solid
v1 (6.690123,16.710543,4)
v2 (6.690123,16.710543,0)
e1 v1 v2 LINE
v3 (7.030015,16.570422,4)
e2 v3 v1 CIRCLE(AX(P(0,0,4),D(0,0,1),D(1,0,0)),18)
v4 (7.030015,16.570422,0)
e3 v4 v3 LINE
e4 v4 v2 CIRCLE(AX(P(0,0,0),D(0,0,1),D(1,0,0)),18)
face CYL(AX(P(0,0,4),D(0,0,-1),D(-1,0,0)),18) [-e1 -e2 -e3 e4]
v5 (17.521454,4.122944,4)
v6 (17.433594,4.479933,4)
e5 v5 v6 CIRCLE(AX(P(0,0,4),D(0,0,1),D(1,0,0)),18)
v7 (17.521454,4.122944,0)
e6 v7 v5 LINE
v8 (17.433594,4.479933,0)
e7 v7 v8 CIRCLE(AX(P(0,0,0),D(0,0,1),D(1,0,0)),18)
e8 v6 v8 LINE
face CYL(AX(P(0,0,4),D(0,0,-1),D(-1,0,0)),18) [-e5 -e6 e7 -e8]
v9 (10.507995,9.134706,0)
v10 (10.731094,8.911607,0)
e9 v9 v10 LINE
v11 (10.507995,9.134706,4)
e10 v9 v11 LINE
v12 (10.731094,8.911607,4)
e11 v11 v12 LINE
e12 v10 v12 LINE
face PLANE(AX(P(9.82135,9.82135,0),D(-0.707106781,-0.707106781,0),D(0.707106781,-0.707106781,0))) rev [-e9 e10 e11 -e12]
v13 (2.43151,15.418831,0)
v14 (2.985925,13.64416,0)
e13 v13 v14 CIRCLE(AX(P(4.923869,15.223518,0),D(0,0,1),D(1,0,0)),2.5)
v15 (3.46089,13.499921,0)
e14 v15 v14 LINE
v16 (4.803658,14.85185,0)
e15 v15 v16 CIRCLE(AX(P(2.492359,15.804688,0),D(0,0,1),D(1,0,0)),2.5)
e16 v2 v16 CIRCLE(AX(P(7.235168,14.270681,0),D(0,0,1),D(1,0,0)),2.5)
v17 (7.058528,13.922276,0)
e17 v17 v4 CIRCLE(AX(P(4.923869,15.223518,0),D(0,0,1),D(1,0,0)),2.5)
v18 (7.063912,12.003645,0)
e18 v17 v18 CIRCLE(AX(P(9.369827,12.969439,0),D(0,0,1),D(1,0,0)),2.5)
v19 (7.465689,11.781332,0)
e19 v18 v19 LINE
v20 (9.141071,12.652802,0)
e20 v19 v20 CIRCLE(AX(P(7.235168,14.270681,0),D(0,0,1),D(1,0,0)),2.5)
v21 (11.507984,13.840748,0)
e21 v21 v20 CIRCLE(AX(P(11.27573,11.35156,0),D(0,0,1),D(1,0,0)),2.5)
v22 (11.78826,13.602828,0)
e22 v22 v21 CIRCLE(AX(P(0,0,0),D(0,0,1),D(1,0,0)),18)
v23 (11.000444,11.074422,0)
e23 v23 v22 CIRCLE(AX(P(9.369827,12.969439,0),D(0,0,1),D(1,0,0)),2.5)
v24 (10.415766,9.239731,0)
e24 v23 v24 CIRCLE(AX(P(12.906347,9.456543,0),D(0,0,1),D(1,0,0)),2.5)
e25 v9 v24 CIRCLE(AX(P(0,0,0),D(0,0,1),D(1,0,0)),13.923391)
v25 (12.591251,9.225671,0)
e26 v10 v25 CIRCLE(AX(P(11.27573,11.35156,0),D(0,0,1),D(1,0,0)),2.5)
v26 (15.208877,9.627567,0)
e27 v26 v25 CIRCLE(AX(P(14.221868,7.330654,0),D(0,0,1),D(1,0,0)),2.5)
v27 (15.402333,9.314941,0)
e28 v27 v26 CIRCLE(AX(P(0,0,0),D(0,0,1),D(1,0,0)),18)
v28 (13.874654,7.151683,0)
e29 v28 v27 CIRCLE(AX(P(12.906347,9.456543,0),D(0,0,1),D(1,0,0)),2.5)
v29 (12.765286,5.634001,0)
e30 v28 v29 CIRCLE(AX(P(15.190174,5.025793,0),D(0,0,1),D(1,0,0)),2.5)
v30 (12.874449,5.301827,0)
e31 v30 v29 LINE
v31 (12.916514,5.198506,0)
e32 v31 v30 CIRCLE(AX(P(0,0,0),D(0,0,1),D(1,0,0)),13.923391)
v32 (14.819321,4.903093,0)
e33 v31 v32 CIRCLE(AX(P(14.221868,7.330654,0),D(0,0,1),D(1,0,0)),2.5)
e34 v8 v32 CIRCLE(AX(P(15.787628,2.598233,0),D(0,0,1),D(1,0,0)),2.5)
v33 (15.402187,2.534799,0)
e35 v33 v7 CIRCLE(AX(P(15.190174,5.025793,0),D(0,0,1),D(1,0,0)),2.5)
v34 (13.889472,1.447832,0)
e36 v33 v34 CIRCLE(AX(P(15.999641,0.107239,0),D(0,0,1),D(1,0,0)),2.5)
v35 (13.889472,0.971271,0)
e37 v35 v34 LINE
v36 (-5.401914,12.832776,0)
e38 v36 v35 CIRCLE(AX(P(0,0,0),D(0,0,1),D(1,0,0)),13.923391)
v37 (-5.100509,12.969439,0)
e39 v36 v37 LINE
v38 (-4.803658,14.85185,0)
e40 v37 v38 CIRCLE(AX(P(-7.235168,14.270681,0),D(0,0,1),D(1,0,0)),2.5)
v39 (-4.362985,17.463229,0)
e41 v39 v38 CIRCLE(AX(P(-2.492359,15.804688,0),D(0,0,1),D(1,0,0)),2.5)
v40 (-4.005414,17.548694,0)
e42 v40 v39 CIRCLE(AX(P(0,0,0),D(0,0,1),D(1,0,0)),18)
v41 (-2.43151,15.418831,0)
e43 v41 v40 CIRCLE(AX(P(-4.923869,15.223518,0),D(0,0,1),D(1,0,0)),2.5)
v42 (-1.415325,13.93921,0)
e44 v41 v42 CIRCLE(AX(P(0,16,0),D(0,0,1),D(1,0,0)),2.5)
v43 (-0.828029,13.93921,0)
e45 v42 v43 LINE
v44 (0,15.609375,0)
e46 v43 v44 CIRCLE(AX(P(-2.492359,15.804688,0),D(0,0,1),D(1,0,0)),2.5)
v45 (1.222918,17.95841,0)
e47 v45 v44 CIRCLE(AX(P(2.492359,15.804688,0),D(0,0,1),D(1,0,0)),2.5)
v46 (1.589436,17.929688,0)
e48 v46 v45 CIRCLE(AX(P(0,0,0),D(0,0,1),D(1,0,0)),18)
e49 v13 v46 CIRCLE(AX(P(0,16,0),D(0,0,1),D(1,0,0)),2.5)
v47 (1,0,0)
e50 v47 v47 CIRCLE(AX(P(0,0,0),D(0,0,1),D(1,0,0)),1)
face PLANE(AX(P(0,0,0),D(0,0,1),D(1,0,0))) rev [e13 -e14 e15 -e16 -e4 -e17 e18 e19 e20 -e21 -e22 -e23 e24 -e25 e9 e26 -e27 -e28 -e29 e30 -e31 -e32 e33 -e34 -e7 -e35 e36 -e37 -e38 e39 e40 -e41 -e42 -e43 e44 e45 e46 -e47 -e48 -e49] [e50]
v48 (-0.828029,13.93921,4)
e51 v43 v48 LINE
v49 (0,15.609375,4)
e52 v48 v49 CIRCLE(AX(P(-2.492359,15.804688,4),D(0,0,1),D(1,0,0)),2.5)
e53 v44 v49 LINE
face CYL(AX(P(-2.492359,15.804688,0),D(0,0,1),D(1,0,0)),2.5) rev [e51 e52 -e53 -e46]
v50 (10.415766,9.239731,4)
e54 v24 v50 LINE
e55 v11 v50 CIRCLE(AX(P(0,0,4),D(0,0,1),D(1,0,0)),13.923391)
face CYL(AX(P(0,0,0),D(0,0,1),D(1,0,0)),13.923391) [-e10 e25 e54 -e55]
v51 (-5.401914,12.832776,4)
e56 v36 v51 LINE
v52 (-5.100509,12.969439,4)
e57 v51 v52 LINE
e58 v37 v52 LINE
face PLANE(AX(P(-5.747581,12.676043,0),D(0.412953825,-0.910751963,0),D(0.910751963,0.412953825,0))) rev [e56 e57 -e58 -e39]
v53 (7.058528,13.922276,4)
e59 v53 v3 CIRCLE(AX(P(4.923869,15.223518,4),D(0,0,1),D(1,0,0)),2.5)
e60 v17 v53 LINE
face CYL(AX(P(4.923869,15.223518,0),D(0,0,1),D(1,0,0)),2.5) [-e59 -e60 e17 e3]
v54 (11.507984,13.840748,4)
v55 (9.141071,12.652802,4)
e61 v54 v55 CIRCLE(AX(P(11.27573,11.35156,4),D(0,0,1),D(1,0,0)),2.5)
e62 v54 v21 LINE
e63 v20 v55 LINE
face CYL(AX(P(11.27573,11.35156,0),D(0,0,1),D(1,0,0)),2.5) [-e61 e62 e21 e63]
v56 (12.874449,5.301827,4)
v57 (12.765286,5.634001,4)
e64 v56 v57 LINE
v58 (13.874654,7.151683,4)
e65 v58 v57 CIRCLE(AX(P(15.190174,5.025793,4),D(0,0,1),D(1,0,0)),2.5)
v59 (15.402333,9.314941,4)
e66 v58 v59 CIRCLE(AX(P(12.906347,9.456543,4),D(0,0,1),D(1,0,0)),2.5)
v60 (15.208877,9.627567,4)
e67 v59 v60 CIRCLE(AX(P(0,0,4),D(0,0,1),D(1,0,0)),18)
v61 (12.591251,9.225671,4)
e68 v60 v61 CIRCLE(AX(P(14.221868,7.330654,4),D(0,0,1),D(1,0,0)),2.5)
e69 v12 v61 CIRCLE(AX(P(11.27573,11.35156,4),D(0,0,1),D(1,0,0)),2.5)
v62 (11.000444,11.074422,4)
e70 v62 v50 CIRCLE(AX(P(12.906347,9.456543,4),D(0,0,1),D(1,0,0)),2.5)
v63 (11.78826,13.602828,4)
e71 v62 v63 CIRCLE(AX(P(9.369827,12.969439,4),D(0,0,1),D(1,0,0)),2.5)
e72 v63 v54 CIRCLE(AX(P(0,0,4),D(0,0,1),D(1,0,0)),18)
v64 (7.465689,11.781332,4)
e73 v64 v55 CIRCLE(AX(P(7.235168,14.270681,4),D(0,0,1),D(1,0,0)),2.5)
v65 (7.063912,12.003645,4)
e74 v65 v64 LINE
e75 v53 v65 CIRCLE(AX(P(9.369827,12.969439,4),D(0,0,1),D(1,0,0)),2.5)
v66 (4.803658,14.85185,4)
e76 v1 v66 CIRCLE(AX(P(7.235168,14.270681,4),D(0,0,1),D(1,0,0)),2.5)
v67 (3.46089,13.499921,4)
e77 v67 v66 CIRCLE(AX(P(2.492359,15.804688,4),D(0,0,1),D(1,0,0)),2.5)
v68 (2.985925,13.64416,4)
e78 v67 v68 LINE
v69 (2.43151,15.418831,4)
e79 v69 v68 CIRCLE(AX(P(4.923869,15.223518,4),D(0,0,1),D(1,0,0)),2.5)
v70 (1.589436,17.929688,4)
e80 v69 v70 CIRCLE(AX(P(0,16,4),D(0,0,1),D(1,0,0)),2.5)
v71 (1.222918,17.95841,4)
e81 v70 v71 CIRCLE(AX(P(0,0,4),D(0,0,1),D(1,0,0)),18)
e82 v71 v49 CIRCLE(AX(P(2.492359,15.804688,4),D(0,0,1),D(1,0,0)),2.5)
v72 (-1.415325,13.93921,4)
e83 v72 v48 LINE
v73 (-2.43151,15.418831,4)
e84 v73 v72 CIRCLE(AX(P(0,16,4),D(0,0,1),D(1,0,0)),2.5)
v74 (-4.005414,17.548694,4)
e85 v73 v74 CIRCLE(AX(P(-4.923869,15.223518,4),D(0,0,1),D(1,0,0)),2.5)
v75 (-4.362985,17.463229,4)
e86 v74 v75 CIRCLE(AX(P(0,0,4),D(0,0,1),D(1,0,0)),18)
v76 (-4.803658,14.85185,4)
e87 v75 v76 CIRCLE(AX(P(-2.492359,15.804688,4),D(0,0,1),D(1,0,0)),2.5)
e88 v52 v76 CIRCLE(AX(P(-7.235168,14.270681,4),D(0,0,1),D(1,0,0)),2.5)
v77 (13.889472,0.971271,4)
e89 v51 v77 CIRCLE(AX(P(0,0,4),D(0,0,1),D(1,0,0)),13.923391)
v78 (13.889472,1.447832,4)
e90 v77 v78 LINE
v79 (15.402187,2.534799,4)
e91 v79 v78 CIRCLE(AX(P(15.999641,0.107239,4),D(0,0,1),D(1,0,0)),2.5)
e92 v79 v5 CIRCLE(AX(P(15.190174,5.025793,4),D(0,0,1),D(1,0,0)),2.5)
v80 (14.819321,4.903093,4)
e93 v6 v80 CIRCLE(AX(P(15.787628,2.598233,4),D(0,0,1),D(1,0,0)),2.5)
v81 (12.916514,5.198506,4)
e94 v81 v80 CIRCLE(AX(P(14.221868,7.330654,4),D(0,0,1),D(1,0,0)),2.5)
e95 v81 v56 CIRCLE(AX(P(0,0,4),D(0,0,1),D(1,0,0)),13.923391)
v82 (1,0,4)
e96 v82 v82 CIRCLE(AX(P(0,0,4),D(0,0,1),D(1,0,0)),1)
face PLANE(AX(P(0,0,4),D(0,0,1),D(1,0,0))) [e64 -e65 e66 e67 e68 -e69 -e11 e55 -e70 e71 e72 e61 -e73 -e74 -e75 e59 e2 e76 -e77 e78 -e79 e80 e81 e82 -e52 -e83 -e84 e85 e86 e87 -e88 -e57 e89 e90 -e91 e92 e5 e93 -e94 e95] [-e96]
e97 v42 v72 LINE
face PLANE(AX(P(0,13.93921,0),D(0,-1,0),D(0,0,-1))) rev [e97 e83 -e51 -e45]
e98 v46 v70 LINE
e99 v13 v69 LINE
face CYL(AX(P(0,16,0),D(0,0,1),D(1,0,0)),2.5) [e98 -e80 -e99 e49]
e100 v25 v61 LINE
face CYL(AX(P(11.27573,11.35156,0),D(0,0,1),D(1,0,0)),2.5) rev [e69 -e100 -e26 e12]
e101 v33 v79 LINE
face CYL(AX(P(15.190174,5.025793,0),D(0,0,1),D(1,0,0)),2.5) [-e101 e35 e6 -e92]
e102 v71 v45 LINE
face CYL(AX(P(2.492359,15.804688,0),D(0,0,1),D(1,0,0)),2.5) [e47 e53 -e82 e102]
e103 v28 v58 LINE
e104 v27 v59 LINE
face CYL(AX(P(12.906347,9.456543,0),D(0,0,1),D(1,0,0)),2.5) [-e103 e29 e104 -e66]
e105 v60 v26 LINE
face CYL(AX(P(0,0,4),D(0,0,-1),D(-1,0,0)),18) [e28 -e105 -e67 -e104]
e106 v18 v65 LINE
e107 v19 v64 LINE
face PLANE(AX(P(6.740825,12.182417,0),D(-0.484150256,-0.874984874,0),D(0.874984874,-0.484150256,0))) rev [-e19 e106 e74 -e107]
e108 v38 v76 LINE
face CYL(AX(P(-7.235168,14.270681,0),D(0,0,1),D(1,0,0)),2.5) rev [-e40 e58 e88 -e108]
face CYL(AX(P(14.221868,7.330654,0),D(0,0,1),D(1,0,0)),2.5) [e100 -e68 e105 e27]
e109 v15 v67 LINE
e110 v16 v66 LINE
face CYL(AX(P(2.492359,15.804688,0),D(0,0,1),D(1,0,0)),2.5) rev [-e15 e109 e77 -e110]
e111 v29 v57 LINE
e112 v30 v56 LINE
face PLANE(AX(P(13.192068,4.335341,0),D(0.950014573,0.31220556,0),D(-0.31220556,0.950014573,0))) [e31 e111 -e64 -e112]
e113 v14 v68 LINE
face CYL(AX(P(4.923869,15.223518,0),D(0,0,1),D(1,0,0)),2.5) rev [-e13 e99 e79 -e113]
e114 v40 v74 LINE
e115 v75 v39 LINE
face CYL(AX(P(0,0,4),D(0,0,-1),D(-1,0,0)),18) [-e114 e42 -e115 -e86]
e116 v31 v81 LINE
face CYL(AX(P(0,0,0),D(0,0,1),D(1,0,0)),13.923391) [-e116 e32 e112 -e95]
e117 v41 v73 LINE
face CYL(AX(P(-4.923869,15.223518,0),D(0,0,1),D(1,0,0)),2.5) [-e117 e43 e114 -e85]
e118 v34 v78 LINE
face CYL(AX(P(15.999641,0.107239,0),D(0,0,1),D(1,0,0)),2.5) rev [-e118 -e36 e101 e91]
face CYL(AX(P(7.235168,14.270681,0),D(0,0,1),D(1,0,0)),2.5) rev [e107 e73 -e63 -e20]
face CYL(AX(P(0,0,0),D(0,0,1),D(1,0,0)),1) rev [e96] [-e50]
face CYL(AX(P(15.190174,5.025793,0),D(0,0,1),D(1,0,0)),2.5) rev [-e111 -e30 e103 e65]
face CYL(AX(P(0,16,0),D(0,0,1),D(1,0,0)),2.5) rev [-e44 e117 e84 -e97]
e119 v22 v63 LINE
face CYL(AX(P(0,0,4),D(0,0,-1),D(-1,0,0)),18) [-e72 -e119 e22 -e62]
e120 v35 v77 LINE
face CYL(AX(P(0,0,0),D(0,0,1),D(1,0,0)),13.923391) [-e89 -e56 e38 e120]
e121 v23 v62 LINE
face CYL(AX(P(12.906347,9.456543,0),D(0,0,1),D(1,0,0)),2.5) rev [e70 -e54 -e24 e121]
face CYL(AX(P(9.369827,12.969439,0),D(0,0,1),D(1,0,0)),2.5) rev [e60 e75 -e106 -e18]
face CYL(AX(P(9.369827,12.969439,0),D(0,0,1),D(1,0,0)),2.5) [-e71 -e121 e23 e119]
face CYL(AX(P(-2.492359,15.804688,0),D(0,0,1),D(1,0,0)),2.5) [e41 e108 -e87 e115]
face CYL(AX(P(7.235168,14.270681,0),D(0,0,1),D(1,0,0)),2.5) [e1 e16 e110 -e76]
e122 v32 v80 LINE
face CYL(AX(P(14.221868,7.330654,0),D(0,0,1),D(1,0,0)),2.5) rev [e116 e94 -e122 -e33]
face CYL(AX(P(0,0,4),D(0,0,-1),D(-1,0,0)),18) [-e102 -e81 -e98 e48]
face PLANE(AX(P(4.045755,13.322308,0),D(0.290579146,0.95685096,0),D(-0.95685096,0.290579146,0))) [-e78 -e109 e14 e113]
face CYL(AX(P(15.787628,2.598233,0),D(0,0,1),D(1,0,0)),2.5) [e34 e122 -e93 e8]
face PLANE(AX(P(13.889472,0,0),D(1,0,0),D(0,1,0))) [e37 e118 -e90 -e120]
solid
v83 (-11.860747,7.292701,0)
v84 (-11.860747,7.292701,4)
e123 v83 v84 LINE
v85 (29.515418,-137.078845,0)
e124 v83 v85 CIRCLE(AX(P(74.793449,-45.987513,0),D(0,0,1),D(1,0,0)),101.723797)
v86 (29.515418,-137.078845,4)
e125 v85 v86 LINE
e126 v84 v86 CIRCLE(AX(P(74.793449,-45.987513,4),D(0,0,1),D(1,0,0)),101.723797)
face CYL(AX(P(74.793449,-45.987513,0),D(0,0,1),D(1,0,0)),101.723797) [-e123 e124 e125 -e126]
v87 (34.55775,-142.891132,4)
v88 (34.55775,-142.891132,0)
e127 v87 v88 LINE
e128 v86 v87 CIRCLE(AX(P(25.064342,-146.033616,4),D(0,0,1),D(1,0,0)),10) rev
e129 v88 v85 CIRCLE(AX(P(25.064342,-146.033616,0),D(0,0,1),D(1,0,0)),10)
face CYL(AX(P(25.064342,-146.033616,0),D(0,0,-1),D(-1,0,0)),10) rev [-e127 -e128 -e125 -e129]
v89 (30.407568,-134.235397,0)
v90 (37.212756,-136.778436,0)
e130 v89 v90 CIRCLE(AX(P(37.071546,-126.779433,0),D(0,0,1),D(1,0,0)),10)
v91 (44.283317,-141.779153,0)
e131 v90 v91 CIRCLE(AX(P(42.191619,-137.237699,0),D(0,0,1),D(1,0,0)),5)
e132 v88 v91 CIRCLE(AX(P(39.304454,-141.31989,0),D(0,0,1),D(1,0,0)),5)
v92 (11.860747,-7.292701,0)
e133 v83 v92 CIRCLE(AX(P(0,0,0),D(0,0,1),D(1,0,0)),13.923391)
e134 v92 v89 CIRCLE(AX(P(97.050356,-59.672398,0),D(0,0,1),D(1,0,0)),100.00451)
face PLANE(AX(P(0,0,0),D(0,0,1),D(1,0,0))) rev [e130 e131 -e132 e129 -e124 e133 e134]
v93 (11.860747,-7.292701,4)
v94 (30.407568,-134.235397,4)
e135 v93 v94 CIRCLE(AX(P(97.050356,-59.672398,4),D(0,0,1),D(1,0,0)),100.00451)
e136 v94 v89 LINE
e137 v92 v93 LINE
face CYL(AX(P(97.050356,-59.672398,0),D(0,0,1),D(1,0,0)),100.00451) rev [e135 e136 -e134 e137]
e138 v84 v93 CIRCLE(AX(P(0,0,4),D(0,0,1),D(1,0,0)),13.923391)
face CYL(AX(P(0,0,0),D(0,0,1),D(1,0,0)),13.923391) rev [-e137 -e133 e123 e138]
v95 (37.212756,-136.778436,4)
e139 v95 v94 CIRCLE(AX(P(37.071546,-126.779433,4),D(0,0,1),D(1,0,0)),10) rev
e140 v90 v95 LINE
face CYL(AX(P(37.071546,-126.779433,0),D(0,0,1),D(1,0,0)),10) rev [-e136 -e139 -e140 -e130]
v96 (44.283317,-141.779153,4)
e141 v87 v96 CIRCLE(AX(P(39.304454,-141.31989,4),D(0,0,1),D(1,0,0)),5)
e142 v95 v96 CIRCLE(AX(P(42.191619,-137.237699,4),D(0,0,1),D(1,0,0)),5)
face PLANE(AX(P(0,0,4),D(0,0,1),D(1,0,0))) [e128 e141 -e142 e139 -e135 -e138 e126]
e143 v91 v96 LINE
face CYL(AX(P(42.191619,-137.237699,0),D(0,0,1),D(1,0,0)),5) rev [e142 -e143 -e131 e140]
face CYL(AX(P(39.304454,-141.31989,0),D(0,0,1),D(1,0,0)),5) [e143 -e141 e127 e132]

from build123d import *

# Parameters (mm, degrees)
ESQUISSE1_R             = 18
BOSS_EXTRU_1_DEPTH      = 4
ESQUISSE3_R             = 1
ENL_V_MAT_EXTRU_3_DEPTH = 26.768197453
BOSS_EXTRU_2_DEPTH      = 4
CONG_1_R                = 10


with BuildPart() as part:
    # Esquisse1 → Boss.-Extru.1 (new body)
    with BuildSketch(Plane.XY):
        Circle(ESQUISSE1_R)
    extrude(amount=BOSS_EXTRU_1_DEPTH)

    # Esquisse3 → Enlèv. mat.-Extru.3 (cut, through all)
    with BuildSketch(Plane.XY.offset(4)):
        with BuildLine():
            ThreePointArc((13.889472301, 0.971270565), (-7.29270091, -11.860747057), (-5.401914148, 12.832775649))
            Line((-5.401914148, 12.832775649), (-5.100509092, 12.969438951))
            ThreePointArc((-5.100509092, 12.969438951), (-4.765685498, 13.881250232), (-4.803657598, 14.851850443))
            ThreePointArc((-4.803657598, 14.851850443), (-4.957505402, 16.220683727), (-4.36298455, 17.463228963))
            ThreePointArc((-4.36298455, 17.463228963), (-9.368945013, -15.369543563), (17.521453605, 4.122943556))
            ThreePointArc((17.521453605, 4.122943556), (16.689385656, 3.025201949), (15.402187493, 2.534799463))
            ThreePointArc((15.402187493, 2.534799463), (14.540813003, 2.137466087), (13.889472301, 1.447832043))
            Line((13.889472301, 1.447832043), (13.889472301, 0.971270565))
        make_face()
        with BuildLine():
            ThreePointArc((11.000443663, 11.074422202), (10.524374819, 10.215627293), (10.415766238, 9.239730569))
            ThreePointArc((10.415766238, 9.239730569), (10.462012349, 9.18733394), (10.507994882, 9.134705846))
            Line((10.507994882, 9.134705846), (10.731094032, 8.911606695))
            ThreePointArc((10.731094032, 8.911606695), (11.691932834, 8.886448288), (12.591250594, 9.225670511))
            ThreePointArc((12.591250594, 9.225670511), (13.842476168, 9.801698523), (15.208877287, 9.627567278))
            ThreePointArc((15.208877287, 9.627567278), (13.644120592, 11.740441784), (11.788259754, 13.602828088))
            ThreePointArc((11.788259754, 13.602828088), (11.756646891, 12.225739007), (11.000443663, 11.074422202))
        make_face()
        with BuildLine():
            Line((12.765286048, 5.634000541), (12.874449055, 5.301826936))
            ThreePointArc((12.874449055, 5.301826936), (12.895585113, 5.250208748), (12.916514217, 5.198506303))
            ThreePointArc((12.916514217, 5.198506303), (13.838334104, 4.860248506), (14.81932063, 4.903093306))
            ThreePointArc((14.81932063, 4.903093306), (16.187092013, 5.066112175), (17.433594078, 4.479932758))
            ThreePointArc((17.433594078, 4.479932758), (16.594995048, 6.971810335), (15.402333491, 9.314940849))
            ThreePointArc((15.402333491, 9.314940849), (14.948466893, 8.014410642), (13.874653946, 7.151682723))
            ThreePointArc((13.874653946, 7.151682723), (13.171881983, 6.501088333), (12.765286048, 5.634000541))
        make_face()
        with BuildLine():
            ThreePointArc((-4.005414493, 17.548693819), (-2.913274427, 16.709287014), (-2.431510322, 15.418830872))
            ThreePointArc((-2.431510322, 15.418830872), (-2.060789897, 14.584674949), (-1.415325051, 13.939210103))
            Line((-1.415325051, 13.939210103), (-0.828029009, 13.939210103))
            ThreePointArc((-0.828029009, 13.939210103), (-0.252520041, 14.694227343), (0, 15.609375))
            ThreePointArc((0, 15.609375), (0.274865703, 16.959124071), (1.222917541, 17.958409526))
            ThreePointArc((1.222917541, 17.958409526), (-1.40625, 17.944984284), (-4.005414493, 17.548693819))
        make_face()
        with BuildLine():
            ThreePointArc((9.141071212, 12.652802258), (10.154306768, 13.585930018), (11.50798377, 13.840748157))
            ThreePointArc((11.50798377, 13.840748157), (9.368945013, 15.369543563), (7.030015125, 16.570422063))
            ThreePointArc((7.030015125, 16.570422063), (7.423724348, 15.250434656), (7.058528078, 13.922276009))
            ThreePointArc((7.058528078, 13.922276009), (6.869836592, 12.962423447), (7.063912165, 12.003645011))
            Line((7.063912165, 12.003645011), (7.465689298, 11.781332023))
            ThreePointArc((7.465689298, 11.781332023), (8.388832813, 12.052786521), (9.141071212, 12.652802258))
        make_face()
        with BuildLine():
            ThreePointArc((6.690123005, 16.710543204), (4.184417725, 17.506874316), (1.589435797, 17.9296875))
            ThreePointArc((1.589435797, 17.9296875), (2.37025361, 16.794920012), (2.431510322, 15.418830872))
            ThreePointArc((2.431510322, 15.418830872), (2.537604324, 14.478038859), (2.985925197, 13.644160005))
            Line((2.985925197, 13.644160005), (3.460890209, 13.499921317))
            ThreePointArc((3.460890209, 13.499921317), (4.266125885, 14.042940985), (4.803657598, 14.851850443))
            ThreePointArc((4.803657598, 14.851850443), (5.480558287, 16.051508379), (6.690123005, 16.710543204))
        make_face()
        Circle(ESQUISSE3_R)
    extrude(amount=-ENL_V_MAT_EXTRU_3_DEPTH, mode=Mode.SUBTRACT)


with BuildPart() as body_2:
    # Esquisse4 → Boss.-Extru.2 (new body)
    with BuildSketch(Plane.XY.offset(4)):
        with BuildLine():
            ThreePointArc((34.662895709, -139.460875386), (38.133110698, -146.180749057), (44.283317366, -141.77915251))
            ThreePointArc((44.283317366, -141.77915251), (39.304454281, -141.319889646), (37.212756046, -136.7784363))
            ThreePointArc((37.212756046, -136.7784363), (36.156932302, -137.434905039), (35.295715434, -138.331576935))
            ThreePointArc((35.295715434, -138.331576935), (-1.39226634, -77.277858146), (11.860747007, -7.292700991))
            ThreePointArc((11.860747007, -7.292700991), (-7.29270108, -11.860746952), (-11.860746898, 7.292701169))
            ThreePointArc((-11.860746898, 7.292701169), (-22.174309584, -76.728115021), (34.662895709, -139.460875386))
        make_face()
    extrude(amount=-BOSS_EXTRU_2_DEPTH)

    # Congé1
    # the kernel refuses this fillet: 10 mm, written as the material it adds along each edge
    with BuildSketch(Plane(origin=(35.295715434, -138.331576935, 4), x_dir=(0.7769969213307092, 0.6295043957293704, 0), z_dir=(0, 0, -1))) as cong_1_piece_1_section:
        with BuildLine():
            CenterArc((8.651939918, -7.858086939), CONG_1_R, 128.204465459, 42.598753979)
            Line((-1.219512554, -6.259829735), (-1.416941604, -6.22786459))
            ThreePointArc((-1.416941604, -6.22786459), (-0.855978817, -3.081946873), (-0.194990134, 0.044484239))
            Line((-0.194990134, 0.044484239), (0.04934487, 0.19381714))
            ThreePointArc((0.04934487, 0.19381714), (1.233621755, 0.045428502), (2.343549582, 0.157161739))
            Line((2.343549582, 0.157161739), (2.46724351, 0))
        make_face()
    cong_1_piece_1 = extrude(amount=4, mode=Mode.PRIVATE)
    cong_1_piece_1 = cong_1_piece_1 - Plane(origin=(42.191619131, -137.237699164, 2), x_dir=(0.4183396470439297, -0.9082906691754354, 0), z_dir=(0, 0, 1)) * Cylinder(5, 34, mode=Mode.PRIVATE)
    add(cong_1_piece_1)
    with BuildSketch(Plane(origin=(34.662895709, -139.460875386, 4), x_dir=(-0.030637951982491078, -0.9995305477564548, 0), z_dir=(0, 0, -1))) as cong_1_piece_2:
        with BuildLine():
            CenterArc((6.86373477, 9.392671944), CONG_1_R, 204.674520586, 45.254332631)
            Line((-2.22320436, 5.218041752), (-2.404943142, 5.134549148))
            ThreePointArc((-2.404943142, 5.134549148), (-1.259222511, 2.546125603), (-0.186109843, -0.073233369))
            Line((-0.186109843, -0.073233369), (0.068637348, -0.187853439))
            ThreePointArc((0.068637348, -0.187853439), (1.715933693, 0.103664028), (3.363230038, -0.187853439))
            Line((3.363230038, -0.187853439), (3.431867385, 0))
        make_face()
    extrude(amount=4)


solid = Compound([part.part, body_2.part])
